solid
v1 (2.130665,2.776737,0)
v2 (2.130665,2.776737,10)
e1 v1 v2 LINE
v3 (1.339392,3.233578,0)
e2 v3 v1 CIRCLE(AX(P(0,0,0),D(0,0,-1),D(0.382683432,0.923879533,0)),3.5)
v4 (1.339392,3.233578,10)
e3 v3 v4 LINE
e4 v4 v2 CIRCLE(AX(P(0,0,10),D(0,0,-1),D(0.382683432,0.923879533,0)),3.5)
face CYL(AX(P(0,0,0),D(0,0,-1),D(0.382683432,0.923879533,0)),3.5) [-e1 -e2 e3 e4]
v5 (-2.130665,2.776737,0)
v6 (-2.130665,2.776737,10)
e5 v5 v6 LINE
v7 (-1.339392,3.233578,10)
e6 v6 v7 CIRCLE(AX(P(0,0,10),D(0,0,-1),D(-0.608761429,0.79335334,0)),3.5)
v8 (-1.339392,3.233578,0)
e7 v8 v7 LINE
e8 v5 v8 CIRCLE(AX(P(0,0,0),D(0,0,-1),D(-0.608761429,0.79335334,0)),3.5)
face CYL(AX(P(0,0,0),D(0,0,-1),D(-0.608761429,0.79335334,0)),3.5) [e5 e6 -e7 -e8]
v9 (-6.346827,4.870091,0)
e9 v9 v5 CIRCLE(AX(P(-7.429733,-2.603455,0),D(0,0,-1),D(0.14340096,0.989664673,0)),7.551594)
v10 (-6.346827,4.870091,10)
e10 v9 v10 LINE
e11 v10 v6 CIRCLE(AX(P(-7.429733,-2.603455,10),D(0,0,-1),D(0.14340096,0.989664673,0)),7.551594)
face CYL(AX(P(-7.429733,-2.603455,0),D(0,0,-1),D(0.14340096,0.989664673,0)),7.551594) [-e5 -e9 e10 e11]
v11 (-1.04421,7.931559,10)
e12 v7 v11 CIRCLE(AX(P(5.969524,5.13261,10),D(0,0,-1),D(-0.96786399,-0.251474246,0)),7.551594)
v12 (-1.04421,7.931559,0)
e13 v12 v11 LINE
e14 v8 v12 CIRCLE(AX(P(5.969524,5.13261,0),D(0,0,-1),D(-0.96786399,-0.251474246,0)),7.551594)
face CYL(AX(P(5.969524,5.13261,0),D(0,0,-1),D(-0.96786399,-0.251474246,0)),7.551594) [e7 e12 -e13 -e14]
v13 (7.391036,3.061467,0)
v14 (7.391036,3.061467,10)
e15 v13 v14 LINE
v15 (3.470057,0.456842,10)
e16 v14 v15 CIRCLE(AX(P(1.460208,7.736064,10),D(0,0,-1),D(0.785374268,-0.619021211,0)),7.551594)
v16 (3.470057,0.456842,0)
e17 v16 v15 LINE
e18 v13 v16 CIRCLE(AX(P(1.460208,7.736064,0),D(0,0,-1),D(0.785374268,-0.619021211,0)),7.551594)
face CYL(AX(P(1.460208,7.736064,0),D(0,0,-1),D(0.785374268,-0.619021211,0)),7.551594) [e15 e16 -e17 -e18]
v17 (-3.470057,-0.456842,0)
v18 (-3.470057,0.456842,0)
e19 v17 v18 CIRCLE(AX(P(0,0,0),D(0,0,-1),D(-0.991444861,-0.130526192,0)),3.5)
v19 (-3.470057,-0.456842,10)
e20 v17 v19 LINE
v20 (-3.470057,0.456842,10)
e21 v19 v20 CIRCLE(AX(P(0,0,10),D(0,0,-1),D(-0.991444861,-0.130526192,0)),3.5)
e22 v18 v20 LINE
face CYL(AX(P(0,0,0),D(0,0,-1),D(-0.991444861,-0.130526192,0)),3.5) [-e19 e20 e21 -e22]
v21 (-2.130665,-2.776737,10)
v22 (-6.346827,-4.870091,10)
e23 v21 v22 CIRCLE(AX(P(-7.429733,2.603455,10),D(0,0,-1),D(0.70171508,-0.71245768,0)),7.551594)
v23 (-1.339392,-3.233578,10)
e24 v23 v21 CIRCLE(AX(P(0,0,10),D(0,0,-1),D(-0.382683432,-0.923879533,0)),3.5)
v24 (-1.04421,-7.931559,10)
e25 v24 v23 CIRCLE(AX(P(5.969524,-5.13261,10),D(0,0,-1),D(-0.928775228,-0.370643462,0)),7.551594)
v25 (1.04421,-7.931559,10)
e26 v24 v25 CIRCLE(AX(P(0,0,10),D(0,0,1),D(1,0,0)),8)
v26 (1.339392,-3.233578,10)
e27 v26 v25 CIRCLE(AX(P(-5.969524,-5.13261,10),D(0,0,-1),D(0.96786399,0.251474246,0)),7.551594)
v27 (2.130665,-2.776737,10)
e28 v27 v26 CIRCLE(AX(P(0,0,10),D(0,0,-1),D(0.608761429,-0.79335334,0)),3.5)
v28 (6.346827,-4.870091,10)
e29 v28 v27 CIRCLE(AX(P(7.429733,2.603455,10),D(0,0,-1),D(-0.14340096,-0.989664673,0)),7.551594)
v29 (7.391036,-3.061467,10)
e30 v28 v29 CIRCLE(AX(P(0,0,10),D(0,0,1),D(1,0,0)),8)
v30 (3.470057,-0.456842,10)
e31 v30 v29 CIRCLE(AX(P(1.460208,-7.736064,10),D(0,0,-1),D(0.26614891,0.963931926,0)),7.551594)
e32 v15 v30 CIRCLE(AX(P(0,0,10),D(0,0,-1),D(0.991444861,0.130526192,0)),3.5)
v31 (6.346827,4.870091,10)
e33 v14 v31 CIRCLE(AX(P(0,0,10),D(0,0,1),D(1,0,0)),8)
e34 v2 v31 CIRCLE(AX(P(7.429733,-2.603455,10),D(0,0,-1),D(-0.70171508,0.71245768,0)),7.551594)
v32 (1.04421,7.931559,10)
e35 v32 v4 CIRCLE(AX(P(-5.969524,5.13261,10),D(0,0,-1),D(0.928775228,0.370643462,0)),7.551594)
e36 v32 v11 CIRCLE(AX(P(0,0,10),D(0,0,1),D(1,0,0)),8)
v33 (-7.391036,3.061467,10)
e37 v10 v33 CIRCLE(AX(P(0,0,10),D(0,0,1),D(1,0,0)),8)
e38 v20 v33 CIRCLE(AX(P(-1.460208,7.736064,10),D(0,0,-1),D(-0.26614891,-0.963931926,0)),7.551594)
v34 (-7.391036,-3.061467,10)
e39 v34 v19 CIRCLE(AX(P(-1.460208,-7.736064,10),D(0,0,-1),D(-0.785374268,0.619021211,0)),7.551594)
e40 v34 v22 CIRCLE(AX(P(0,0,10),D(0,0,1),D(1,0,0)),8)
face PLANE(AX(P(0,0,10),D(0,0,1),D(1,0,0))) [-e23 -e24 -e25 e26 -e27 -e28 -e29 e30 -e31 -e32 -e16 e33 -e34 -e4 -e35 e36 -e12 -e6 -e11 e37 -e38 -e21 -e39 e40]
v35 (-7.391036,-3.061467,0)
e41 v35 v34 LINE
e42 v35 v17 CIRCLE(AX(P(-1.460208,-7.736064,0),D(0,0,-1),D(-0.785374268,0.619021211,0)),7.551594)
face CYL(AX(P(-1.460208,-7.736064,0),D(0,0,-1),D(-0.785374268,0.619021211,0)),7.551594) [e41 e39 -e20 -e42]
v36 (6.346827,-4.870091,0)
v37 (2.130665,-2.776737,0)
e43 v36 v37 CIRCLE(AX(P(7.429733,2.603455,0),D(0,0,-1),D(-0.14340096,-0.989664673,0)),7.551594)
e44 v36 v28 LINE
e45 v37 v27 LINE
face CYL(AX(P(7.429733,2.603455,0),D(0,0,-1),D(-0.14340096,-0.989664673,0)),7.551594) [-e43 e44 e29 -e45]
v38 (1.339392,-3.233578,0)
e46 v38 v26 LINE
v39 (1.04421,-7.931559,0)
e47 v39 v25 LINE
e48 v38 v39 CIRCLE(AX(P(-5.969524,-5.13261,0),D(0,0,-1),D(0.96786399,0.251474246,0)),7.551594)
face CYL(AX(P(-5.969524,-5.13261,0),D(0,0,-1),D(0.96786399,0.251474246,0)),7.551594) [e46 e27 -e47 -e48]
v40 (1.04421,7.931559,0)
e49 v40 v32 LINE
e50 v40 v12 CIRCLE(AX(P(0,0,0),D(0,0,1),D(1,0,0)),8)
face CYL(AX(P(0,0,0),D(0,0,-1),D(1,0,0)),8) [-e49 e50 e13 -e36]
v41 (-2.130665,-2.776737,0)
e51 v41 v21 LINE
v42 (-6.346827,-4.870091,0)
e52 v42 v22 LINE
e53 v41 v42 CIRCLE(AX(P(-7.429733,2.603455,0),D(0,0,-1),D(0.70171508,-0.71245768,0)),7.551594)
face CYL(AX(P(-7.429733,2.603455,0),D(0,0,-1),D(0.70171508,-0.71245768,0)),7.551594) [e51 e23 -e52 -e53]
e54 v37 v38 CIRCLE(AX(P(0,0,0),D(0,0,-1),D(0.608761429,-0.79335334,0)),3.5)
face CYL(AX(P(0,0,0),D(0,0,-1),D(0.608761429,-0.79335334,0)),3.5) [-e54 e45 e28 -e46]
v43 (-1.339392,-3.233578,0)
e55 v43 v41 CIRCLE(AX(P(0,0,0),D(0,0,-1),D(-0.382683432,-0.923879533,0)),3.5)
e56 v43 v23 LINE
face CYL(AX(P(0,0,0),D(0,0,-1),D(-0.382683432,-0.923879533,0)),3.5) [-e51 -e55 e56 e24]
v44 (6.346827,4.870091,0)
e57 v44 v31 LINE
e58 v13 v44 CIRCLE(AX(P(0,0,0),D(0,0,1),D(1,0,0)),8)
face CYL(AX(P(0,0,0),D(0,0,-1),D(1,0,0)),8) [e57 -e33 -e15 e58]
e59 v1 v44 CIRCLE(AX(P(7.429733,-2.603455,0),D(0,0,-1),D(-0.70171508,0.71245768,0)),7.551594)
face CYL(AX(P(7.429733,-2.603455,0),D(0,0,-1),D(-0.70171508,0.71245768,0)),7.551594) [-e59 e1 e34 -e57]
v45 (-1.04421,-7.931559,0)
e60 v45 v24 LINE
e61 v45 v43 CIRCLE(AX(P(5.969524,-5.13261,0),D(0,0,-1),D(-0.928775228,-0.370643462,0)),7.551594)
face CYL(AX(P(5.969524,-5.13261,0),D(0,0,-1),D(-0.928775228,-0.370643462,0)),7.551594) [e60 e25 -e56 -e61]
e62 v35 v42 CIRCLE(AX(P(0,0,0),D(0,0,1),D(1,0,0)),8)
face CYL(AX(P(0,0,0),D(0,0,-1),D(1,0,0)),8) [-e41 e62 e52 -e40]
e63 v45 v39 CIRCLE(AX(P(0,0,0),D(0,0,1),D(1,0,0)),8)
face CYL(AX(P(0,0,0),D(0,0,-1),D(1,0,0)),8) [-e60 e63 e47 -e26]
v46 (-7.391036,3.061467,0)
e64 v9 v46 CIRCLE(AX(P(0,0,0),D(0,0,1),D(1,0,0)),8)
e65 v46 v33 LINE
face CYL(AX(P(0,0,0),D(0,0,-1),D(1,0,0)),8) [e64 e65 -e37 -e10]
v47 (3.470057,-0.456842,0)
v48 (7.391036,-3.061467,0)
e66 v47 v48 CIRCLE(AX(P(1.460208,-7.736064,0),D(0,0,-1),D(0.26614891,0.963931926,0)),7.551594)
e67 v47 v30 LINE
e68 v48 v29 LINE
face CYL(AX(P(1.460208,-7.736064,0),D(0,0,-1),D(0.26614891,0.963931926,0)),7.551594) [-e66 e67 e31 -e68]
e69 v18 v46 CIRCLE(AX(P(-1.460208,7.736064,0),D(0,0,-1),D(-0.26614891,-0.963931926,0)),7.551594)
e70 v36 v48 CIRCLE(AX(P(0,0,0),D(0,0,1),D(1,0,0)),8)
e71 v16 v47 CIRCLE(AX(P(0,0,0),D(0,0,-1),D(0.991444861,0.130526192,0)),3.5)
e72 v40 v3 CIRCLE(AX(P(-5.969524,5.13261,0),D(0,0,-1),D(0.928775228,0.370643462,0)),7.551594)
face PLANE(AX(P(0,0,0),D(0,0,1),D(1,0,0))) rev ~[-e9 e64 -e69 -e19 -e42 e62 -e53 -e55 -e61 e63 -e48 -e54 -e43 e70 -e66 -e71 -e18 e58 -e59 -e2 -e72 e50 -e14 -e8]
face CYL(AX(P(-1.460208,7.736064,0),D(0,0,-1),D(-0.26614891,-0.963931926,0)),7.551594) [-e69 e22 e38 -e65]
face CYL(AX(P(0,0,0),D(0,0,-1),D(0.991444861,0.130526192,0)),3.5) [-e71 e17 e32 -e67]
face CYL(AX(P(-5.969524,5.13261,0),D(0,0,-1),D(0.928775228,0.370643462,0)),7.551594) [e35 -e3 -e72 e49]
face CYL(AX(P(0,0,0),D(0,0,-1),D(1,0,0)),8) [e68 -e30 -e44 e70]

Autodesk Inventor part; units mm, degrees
sketch "Sketch1" plane through (0, 0, 0) normal (0, 0, 1) x (1, 0, 0)
  circle A0 centre (0, 0) radius 8
  dimension "d0" = 16
extrude "Extrusion1" add sketch "Sketch1" along normal blind 10
ref_plane "Work Plane2" through (0, 0, 5) normal (0, 0, 1) x (1, 0, 0)
sketch "Sketch2" plane through (0, 0, 0) normal (0, 0, -1) x (-1, 0, 0)
  circle A0 centre (0, 0) radius 8 projected
  circle A1 centre (0, 0) radius 6
  dimension "d3" = 12
surface extrude "Pitch Diameter" sketch "Sketch2" against normal through all shown no curves A1
ref_plane "Work Plane8" through (0, 0, 0) normal (0.8660254, 0.5, 0) x (0, 0, 1)
ref_plane "Work Plane9" through (0, 0, 0) normal (1, 0, 0) x (0, 1, 0)
spur gear teeth "Spur Gear" teeth 6 pitch diameter 12 tip diameter 16 root diameter 7 face width 10 start plane through (0, 0, 0) normal (0, 0, -1) x (-1, 0, 0)
equation "\"d0\" = da_da"
equation "\"d1\" = da_b"
equation "\"d3\" = da_d"
equation "\"d16\" = da_aw"
equation "\"d43\" = da_aw"
equation "\"d46\" = da_aw"
equation "\"da_da\" = 16"
equation "\"da_b\" = 10"
equation "\"da_d\" = 12"
equation "\"da_aw\" = 63"
properties part number "Spur Gear1" material "Steel"
